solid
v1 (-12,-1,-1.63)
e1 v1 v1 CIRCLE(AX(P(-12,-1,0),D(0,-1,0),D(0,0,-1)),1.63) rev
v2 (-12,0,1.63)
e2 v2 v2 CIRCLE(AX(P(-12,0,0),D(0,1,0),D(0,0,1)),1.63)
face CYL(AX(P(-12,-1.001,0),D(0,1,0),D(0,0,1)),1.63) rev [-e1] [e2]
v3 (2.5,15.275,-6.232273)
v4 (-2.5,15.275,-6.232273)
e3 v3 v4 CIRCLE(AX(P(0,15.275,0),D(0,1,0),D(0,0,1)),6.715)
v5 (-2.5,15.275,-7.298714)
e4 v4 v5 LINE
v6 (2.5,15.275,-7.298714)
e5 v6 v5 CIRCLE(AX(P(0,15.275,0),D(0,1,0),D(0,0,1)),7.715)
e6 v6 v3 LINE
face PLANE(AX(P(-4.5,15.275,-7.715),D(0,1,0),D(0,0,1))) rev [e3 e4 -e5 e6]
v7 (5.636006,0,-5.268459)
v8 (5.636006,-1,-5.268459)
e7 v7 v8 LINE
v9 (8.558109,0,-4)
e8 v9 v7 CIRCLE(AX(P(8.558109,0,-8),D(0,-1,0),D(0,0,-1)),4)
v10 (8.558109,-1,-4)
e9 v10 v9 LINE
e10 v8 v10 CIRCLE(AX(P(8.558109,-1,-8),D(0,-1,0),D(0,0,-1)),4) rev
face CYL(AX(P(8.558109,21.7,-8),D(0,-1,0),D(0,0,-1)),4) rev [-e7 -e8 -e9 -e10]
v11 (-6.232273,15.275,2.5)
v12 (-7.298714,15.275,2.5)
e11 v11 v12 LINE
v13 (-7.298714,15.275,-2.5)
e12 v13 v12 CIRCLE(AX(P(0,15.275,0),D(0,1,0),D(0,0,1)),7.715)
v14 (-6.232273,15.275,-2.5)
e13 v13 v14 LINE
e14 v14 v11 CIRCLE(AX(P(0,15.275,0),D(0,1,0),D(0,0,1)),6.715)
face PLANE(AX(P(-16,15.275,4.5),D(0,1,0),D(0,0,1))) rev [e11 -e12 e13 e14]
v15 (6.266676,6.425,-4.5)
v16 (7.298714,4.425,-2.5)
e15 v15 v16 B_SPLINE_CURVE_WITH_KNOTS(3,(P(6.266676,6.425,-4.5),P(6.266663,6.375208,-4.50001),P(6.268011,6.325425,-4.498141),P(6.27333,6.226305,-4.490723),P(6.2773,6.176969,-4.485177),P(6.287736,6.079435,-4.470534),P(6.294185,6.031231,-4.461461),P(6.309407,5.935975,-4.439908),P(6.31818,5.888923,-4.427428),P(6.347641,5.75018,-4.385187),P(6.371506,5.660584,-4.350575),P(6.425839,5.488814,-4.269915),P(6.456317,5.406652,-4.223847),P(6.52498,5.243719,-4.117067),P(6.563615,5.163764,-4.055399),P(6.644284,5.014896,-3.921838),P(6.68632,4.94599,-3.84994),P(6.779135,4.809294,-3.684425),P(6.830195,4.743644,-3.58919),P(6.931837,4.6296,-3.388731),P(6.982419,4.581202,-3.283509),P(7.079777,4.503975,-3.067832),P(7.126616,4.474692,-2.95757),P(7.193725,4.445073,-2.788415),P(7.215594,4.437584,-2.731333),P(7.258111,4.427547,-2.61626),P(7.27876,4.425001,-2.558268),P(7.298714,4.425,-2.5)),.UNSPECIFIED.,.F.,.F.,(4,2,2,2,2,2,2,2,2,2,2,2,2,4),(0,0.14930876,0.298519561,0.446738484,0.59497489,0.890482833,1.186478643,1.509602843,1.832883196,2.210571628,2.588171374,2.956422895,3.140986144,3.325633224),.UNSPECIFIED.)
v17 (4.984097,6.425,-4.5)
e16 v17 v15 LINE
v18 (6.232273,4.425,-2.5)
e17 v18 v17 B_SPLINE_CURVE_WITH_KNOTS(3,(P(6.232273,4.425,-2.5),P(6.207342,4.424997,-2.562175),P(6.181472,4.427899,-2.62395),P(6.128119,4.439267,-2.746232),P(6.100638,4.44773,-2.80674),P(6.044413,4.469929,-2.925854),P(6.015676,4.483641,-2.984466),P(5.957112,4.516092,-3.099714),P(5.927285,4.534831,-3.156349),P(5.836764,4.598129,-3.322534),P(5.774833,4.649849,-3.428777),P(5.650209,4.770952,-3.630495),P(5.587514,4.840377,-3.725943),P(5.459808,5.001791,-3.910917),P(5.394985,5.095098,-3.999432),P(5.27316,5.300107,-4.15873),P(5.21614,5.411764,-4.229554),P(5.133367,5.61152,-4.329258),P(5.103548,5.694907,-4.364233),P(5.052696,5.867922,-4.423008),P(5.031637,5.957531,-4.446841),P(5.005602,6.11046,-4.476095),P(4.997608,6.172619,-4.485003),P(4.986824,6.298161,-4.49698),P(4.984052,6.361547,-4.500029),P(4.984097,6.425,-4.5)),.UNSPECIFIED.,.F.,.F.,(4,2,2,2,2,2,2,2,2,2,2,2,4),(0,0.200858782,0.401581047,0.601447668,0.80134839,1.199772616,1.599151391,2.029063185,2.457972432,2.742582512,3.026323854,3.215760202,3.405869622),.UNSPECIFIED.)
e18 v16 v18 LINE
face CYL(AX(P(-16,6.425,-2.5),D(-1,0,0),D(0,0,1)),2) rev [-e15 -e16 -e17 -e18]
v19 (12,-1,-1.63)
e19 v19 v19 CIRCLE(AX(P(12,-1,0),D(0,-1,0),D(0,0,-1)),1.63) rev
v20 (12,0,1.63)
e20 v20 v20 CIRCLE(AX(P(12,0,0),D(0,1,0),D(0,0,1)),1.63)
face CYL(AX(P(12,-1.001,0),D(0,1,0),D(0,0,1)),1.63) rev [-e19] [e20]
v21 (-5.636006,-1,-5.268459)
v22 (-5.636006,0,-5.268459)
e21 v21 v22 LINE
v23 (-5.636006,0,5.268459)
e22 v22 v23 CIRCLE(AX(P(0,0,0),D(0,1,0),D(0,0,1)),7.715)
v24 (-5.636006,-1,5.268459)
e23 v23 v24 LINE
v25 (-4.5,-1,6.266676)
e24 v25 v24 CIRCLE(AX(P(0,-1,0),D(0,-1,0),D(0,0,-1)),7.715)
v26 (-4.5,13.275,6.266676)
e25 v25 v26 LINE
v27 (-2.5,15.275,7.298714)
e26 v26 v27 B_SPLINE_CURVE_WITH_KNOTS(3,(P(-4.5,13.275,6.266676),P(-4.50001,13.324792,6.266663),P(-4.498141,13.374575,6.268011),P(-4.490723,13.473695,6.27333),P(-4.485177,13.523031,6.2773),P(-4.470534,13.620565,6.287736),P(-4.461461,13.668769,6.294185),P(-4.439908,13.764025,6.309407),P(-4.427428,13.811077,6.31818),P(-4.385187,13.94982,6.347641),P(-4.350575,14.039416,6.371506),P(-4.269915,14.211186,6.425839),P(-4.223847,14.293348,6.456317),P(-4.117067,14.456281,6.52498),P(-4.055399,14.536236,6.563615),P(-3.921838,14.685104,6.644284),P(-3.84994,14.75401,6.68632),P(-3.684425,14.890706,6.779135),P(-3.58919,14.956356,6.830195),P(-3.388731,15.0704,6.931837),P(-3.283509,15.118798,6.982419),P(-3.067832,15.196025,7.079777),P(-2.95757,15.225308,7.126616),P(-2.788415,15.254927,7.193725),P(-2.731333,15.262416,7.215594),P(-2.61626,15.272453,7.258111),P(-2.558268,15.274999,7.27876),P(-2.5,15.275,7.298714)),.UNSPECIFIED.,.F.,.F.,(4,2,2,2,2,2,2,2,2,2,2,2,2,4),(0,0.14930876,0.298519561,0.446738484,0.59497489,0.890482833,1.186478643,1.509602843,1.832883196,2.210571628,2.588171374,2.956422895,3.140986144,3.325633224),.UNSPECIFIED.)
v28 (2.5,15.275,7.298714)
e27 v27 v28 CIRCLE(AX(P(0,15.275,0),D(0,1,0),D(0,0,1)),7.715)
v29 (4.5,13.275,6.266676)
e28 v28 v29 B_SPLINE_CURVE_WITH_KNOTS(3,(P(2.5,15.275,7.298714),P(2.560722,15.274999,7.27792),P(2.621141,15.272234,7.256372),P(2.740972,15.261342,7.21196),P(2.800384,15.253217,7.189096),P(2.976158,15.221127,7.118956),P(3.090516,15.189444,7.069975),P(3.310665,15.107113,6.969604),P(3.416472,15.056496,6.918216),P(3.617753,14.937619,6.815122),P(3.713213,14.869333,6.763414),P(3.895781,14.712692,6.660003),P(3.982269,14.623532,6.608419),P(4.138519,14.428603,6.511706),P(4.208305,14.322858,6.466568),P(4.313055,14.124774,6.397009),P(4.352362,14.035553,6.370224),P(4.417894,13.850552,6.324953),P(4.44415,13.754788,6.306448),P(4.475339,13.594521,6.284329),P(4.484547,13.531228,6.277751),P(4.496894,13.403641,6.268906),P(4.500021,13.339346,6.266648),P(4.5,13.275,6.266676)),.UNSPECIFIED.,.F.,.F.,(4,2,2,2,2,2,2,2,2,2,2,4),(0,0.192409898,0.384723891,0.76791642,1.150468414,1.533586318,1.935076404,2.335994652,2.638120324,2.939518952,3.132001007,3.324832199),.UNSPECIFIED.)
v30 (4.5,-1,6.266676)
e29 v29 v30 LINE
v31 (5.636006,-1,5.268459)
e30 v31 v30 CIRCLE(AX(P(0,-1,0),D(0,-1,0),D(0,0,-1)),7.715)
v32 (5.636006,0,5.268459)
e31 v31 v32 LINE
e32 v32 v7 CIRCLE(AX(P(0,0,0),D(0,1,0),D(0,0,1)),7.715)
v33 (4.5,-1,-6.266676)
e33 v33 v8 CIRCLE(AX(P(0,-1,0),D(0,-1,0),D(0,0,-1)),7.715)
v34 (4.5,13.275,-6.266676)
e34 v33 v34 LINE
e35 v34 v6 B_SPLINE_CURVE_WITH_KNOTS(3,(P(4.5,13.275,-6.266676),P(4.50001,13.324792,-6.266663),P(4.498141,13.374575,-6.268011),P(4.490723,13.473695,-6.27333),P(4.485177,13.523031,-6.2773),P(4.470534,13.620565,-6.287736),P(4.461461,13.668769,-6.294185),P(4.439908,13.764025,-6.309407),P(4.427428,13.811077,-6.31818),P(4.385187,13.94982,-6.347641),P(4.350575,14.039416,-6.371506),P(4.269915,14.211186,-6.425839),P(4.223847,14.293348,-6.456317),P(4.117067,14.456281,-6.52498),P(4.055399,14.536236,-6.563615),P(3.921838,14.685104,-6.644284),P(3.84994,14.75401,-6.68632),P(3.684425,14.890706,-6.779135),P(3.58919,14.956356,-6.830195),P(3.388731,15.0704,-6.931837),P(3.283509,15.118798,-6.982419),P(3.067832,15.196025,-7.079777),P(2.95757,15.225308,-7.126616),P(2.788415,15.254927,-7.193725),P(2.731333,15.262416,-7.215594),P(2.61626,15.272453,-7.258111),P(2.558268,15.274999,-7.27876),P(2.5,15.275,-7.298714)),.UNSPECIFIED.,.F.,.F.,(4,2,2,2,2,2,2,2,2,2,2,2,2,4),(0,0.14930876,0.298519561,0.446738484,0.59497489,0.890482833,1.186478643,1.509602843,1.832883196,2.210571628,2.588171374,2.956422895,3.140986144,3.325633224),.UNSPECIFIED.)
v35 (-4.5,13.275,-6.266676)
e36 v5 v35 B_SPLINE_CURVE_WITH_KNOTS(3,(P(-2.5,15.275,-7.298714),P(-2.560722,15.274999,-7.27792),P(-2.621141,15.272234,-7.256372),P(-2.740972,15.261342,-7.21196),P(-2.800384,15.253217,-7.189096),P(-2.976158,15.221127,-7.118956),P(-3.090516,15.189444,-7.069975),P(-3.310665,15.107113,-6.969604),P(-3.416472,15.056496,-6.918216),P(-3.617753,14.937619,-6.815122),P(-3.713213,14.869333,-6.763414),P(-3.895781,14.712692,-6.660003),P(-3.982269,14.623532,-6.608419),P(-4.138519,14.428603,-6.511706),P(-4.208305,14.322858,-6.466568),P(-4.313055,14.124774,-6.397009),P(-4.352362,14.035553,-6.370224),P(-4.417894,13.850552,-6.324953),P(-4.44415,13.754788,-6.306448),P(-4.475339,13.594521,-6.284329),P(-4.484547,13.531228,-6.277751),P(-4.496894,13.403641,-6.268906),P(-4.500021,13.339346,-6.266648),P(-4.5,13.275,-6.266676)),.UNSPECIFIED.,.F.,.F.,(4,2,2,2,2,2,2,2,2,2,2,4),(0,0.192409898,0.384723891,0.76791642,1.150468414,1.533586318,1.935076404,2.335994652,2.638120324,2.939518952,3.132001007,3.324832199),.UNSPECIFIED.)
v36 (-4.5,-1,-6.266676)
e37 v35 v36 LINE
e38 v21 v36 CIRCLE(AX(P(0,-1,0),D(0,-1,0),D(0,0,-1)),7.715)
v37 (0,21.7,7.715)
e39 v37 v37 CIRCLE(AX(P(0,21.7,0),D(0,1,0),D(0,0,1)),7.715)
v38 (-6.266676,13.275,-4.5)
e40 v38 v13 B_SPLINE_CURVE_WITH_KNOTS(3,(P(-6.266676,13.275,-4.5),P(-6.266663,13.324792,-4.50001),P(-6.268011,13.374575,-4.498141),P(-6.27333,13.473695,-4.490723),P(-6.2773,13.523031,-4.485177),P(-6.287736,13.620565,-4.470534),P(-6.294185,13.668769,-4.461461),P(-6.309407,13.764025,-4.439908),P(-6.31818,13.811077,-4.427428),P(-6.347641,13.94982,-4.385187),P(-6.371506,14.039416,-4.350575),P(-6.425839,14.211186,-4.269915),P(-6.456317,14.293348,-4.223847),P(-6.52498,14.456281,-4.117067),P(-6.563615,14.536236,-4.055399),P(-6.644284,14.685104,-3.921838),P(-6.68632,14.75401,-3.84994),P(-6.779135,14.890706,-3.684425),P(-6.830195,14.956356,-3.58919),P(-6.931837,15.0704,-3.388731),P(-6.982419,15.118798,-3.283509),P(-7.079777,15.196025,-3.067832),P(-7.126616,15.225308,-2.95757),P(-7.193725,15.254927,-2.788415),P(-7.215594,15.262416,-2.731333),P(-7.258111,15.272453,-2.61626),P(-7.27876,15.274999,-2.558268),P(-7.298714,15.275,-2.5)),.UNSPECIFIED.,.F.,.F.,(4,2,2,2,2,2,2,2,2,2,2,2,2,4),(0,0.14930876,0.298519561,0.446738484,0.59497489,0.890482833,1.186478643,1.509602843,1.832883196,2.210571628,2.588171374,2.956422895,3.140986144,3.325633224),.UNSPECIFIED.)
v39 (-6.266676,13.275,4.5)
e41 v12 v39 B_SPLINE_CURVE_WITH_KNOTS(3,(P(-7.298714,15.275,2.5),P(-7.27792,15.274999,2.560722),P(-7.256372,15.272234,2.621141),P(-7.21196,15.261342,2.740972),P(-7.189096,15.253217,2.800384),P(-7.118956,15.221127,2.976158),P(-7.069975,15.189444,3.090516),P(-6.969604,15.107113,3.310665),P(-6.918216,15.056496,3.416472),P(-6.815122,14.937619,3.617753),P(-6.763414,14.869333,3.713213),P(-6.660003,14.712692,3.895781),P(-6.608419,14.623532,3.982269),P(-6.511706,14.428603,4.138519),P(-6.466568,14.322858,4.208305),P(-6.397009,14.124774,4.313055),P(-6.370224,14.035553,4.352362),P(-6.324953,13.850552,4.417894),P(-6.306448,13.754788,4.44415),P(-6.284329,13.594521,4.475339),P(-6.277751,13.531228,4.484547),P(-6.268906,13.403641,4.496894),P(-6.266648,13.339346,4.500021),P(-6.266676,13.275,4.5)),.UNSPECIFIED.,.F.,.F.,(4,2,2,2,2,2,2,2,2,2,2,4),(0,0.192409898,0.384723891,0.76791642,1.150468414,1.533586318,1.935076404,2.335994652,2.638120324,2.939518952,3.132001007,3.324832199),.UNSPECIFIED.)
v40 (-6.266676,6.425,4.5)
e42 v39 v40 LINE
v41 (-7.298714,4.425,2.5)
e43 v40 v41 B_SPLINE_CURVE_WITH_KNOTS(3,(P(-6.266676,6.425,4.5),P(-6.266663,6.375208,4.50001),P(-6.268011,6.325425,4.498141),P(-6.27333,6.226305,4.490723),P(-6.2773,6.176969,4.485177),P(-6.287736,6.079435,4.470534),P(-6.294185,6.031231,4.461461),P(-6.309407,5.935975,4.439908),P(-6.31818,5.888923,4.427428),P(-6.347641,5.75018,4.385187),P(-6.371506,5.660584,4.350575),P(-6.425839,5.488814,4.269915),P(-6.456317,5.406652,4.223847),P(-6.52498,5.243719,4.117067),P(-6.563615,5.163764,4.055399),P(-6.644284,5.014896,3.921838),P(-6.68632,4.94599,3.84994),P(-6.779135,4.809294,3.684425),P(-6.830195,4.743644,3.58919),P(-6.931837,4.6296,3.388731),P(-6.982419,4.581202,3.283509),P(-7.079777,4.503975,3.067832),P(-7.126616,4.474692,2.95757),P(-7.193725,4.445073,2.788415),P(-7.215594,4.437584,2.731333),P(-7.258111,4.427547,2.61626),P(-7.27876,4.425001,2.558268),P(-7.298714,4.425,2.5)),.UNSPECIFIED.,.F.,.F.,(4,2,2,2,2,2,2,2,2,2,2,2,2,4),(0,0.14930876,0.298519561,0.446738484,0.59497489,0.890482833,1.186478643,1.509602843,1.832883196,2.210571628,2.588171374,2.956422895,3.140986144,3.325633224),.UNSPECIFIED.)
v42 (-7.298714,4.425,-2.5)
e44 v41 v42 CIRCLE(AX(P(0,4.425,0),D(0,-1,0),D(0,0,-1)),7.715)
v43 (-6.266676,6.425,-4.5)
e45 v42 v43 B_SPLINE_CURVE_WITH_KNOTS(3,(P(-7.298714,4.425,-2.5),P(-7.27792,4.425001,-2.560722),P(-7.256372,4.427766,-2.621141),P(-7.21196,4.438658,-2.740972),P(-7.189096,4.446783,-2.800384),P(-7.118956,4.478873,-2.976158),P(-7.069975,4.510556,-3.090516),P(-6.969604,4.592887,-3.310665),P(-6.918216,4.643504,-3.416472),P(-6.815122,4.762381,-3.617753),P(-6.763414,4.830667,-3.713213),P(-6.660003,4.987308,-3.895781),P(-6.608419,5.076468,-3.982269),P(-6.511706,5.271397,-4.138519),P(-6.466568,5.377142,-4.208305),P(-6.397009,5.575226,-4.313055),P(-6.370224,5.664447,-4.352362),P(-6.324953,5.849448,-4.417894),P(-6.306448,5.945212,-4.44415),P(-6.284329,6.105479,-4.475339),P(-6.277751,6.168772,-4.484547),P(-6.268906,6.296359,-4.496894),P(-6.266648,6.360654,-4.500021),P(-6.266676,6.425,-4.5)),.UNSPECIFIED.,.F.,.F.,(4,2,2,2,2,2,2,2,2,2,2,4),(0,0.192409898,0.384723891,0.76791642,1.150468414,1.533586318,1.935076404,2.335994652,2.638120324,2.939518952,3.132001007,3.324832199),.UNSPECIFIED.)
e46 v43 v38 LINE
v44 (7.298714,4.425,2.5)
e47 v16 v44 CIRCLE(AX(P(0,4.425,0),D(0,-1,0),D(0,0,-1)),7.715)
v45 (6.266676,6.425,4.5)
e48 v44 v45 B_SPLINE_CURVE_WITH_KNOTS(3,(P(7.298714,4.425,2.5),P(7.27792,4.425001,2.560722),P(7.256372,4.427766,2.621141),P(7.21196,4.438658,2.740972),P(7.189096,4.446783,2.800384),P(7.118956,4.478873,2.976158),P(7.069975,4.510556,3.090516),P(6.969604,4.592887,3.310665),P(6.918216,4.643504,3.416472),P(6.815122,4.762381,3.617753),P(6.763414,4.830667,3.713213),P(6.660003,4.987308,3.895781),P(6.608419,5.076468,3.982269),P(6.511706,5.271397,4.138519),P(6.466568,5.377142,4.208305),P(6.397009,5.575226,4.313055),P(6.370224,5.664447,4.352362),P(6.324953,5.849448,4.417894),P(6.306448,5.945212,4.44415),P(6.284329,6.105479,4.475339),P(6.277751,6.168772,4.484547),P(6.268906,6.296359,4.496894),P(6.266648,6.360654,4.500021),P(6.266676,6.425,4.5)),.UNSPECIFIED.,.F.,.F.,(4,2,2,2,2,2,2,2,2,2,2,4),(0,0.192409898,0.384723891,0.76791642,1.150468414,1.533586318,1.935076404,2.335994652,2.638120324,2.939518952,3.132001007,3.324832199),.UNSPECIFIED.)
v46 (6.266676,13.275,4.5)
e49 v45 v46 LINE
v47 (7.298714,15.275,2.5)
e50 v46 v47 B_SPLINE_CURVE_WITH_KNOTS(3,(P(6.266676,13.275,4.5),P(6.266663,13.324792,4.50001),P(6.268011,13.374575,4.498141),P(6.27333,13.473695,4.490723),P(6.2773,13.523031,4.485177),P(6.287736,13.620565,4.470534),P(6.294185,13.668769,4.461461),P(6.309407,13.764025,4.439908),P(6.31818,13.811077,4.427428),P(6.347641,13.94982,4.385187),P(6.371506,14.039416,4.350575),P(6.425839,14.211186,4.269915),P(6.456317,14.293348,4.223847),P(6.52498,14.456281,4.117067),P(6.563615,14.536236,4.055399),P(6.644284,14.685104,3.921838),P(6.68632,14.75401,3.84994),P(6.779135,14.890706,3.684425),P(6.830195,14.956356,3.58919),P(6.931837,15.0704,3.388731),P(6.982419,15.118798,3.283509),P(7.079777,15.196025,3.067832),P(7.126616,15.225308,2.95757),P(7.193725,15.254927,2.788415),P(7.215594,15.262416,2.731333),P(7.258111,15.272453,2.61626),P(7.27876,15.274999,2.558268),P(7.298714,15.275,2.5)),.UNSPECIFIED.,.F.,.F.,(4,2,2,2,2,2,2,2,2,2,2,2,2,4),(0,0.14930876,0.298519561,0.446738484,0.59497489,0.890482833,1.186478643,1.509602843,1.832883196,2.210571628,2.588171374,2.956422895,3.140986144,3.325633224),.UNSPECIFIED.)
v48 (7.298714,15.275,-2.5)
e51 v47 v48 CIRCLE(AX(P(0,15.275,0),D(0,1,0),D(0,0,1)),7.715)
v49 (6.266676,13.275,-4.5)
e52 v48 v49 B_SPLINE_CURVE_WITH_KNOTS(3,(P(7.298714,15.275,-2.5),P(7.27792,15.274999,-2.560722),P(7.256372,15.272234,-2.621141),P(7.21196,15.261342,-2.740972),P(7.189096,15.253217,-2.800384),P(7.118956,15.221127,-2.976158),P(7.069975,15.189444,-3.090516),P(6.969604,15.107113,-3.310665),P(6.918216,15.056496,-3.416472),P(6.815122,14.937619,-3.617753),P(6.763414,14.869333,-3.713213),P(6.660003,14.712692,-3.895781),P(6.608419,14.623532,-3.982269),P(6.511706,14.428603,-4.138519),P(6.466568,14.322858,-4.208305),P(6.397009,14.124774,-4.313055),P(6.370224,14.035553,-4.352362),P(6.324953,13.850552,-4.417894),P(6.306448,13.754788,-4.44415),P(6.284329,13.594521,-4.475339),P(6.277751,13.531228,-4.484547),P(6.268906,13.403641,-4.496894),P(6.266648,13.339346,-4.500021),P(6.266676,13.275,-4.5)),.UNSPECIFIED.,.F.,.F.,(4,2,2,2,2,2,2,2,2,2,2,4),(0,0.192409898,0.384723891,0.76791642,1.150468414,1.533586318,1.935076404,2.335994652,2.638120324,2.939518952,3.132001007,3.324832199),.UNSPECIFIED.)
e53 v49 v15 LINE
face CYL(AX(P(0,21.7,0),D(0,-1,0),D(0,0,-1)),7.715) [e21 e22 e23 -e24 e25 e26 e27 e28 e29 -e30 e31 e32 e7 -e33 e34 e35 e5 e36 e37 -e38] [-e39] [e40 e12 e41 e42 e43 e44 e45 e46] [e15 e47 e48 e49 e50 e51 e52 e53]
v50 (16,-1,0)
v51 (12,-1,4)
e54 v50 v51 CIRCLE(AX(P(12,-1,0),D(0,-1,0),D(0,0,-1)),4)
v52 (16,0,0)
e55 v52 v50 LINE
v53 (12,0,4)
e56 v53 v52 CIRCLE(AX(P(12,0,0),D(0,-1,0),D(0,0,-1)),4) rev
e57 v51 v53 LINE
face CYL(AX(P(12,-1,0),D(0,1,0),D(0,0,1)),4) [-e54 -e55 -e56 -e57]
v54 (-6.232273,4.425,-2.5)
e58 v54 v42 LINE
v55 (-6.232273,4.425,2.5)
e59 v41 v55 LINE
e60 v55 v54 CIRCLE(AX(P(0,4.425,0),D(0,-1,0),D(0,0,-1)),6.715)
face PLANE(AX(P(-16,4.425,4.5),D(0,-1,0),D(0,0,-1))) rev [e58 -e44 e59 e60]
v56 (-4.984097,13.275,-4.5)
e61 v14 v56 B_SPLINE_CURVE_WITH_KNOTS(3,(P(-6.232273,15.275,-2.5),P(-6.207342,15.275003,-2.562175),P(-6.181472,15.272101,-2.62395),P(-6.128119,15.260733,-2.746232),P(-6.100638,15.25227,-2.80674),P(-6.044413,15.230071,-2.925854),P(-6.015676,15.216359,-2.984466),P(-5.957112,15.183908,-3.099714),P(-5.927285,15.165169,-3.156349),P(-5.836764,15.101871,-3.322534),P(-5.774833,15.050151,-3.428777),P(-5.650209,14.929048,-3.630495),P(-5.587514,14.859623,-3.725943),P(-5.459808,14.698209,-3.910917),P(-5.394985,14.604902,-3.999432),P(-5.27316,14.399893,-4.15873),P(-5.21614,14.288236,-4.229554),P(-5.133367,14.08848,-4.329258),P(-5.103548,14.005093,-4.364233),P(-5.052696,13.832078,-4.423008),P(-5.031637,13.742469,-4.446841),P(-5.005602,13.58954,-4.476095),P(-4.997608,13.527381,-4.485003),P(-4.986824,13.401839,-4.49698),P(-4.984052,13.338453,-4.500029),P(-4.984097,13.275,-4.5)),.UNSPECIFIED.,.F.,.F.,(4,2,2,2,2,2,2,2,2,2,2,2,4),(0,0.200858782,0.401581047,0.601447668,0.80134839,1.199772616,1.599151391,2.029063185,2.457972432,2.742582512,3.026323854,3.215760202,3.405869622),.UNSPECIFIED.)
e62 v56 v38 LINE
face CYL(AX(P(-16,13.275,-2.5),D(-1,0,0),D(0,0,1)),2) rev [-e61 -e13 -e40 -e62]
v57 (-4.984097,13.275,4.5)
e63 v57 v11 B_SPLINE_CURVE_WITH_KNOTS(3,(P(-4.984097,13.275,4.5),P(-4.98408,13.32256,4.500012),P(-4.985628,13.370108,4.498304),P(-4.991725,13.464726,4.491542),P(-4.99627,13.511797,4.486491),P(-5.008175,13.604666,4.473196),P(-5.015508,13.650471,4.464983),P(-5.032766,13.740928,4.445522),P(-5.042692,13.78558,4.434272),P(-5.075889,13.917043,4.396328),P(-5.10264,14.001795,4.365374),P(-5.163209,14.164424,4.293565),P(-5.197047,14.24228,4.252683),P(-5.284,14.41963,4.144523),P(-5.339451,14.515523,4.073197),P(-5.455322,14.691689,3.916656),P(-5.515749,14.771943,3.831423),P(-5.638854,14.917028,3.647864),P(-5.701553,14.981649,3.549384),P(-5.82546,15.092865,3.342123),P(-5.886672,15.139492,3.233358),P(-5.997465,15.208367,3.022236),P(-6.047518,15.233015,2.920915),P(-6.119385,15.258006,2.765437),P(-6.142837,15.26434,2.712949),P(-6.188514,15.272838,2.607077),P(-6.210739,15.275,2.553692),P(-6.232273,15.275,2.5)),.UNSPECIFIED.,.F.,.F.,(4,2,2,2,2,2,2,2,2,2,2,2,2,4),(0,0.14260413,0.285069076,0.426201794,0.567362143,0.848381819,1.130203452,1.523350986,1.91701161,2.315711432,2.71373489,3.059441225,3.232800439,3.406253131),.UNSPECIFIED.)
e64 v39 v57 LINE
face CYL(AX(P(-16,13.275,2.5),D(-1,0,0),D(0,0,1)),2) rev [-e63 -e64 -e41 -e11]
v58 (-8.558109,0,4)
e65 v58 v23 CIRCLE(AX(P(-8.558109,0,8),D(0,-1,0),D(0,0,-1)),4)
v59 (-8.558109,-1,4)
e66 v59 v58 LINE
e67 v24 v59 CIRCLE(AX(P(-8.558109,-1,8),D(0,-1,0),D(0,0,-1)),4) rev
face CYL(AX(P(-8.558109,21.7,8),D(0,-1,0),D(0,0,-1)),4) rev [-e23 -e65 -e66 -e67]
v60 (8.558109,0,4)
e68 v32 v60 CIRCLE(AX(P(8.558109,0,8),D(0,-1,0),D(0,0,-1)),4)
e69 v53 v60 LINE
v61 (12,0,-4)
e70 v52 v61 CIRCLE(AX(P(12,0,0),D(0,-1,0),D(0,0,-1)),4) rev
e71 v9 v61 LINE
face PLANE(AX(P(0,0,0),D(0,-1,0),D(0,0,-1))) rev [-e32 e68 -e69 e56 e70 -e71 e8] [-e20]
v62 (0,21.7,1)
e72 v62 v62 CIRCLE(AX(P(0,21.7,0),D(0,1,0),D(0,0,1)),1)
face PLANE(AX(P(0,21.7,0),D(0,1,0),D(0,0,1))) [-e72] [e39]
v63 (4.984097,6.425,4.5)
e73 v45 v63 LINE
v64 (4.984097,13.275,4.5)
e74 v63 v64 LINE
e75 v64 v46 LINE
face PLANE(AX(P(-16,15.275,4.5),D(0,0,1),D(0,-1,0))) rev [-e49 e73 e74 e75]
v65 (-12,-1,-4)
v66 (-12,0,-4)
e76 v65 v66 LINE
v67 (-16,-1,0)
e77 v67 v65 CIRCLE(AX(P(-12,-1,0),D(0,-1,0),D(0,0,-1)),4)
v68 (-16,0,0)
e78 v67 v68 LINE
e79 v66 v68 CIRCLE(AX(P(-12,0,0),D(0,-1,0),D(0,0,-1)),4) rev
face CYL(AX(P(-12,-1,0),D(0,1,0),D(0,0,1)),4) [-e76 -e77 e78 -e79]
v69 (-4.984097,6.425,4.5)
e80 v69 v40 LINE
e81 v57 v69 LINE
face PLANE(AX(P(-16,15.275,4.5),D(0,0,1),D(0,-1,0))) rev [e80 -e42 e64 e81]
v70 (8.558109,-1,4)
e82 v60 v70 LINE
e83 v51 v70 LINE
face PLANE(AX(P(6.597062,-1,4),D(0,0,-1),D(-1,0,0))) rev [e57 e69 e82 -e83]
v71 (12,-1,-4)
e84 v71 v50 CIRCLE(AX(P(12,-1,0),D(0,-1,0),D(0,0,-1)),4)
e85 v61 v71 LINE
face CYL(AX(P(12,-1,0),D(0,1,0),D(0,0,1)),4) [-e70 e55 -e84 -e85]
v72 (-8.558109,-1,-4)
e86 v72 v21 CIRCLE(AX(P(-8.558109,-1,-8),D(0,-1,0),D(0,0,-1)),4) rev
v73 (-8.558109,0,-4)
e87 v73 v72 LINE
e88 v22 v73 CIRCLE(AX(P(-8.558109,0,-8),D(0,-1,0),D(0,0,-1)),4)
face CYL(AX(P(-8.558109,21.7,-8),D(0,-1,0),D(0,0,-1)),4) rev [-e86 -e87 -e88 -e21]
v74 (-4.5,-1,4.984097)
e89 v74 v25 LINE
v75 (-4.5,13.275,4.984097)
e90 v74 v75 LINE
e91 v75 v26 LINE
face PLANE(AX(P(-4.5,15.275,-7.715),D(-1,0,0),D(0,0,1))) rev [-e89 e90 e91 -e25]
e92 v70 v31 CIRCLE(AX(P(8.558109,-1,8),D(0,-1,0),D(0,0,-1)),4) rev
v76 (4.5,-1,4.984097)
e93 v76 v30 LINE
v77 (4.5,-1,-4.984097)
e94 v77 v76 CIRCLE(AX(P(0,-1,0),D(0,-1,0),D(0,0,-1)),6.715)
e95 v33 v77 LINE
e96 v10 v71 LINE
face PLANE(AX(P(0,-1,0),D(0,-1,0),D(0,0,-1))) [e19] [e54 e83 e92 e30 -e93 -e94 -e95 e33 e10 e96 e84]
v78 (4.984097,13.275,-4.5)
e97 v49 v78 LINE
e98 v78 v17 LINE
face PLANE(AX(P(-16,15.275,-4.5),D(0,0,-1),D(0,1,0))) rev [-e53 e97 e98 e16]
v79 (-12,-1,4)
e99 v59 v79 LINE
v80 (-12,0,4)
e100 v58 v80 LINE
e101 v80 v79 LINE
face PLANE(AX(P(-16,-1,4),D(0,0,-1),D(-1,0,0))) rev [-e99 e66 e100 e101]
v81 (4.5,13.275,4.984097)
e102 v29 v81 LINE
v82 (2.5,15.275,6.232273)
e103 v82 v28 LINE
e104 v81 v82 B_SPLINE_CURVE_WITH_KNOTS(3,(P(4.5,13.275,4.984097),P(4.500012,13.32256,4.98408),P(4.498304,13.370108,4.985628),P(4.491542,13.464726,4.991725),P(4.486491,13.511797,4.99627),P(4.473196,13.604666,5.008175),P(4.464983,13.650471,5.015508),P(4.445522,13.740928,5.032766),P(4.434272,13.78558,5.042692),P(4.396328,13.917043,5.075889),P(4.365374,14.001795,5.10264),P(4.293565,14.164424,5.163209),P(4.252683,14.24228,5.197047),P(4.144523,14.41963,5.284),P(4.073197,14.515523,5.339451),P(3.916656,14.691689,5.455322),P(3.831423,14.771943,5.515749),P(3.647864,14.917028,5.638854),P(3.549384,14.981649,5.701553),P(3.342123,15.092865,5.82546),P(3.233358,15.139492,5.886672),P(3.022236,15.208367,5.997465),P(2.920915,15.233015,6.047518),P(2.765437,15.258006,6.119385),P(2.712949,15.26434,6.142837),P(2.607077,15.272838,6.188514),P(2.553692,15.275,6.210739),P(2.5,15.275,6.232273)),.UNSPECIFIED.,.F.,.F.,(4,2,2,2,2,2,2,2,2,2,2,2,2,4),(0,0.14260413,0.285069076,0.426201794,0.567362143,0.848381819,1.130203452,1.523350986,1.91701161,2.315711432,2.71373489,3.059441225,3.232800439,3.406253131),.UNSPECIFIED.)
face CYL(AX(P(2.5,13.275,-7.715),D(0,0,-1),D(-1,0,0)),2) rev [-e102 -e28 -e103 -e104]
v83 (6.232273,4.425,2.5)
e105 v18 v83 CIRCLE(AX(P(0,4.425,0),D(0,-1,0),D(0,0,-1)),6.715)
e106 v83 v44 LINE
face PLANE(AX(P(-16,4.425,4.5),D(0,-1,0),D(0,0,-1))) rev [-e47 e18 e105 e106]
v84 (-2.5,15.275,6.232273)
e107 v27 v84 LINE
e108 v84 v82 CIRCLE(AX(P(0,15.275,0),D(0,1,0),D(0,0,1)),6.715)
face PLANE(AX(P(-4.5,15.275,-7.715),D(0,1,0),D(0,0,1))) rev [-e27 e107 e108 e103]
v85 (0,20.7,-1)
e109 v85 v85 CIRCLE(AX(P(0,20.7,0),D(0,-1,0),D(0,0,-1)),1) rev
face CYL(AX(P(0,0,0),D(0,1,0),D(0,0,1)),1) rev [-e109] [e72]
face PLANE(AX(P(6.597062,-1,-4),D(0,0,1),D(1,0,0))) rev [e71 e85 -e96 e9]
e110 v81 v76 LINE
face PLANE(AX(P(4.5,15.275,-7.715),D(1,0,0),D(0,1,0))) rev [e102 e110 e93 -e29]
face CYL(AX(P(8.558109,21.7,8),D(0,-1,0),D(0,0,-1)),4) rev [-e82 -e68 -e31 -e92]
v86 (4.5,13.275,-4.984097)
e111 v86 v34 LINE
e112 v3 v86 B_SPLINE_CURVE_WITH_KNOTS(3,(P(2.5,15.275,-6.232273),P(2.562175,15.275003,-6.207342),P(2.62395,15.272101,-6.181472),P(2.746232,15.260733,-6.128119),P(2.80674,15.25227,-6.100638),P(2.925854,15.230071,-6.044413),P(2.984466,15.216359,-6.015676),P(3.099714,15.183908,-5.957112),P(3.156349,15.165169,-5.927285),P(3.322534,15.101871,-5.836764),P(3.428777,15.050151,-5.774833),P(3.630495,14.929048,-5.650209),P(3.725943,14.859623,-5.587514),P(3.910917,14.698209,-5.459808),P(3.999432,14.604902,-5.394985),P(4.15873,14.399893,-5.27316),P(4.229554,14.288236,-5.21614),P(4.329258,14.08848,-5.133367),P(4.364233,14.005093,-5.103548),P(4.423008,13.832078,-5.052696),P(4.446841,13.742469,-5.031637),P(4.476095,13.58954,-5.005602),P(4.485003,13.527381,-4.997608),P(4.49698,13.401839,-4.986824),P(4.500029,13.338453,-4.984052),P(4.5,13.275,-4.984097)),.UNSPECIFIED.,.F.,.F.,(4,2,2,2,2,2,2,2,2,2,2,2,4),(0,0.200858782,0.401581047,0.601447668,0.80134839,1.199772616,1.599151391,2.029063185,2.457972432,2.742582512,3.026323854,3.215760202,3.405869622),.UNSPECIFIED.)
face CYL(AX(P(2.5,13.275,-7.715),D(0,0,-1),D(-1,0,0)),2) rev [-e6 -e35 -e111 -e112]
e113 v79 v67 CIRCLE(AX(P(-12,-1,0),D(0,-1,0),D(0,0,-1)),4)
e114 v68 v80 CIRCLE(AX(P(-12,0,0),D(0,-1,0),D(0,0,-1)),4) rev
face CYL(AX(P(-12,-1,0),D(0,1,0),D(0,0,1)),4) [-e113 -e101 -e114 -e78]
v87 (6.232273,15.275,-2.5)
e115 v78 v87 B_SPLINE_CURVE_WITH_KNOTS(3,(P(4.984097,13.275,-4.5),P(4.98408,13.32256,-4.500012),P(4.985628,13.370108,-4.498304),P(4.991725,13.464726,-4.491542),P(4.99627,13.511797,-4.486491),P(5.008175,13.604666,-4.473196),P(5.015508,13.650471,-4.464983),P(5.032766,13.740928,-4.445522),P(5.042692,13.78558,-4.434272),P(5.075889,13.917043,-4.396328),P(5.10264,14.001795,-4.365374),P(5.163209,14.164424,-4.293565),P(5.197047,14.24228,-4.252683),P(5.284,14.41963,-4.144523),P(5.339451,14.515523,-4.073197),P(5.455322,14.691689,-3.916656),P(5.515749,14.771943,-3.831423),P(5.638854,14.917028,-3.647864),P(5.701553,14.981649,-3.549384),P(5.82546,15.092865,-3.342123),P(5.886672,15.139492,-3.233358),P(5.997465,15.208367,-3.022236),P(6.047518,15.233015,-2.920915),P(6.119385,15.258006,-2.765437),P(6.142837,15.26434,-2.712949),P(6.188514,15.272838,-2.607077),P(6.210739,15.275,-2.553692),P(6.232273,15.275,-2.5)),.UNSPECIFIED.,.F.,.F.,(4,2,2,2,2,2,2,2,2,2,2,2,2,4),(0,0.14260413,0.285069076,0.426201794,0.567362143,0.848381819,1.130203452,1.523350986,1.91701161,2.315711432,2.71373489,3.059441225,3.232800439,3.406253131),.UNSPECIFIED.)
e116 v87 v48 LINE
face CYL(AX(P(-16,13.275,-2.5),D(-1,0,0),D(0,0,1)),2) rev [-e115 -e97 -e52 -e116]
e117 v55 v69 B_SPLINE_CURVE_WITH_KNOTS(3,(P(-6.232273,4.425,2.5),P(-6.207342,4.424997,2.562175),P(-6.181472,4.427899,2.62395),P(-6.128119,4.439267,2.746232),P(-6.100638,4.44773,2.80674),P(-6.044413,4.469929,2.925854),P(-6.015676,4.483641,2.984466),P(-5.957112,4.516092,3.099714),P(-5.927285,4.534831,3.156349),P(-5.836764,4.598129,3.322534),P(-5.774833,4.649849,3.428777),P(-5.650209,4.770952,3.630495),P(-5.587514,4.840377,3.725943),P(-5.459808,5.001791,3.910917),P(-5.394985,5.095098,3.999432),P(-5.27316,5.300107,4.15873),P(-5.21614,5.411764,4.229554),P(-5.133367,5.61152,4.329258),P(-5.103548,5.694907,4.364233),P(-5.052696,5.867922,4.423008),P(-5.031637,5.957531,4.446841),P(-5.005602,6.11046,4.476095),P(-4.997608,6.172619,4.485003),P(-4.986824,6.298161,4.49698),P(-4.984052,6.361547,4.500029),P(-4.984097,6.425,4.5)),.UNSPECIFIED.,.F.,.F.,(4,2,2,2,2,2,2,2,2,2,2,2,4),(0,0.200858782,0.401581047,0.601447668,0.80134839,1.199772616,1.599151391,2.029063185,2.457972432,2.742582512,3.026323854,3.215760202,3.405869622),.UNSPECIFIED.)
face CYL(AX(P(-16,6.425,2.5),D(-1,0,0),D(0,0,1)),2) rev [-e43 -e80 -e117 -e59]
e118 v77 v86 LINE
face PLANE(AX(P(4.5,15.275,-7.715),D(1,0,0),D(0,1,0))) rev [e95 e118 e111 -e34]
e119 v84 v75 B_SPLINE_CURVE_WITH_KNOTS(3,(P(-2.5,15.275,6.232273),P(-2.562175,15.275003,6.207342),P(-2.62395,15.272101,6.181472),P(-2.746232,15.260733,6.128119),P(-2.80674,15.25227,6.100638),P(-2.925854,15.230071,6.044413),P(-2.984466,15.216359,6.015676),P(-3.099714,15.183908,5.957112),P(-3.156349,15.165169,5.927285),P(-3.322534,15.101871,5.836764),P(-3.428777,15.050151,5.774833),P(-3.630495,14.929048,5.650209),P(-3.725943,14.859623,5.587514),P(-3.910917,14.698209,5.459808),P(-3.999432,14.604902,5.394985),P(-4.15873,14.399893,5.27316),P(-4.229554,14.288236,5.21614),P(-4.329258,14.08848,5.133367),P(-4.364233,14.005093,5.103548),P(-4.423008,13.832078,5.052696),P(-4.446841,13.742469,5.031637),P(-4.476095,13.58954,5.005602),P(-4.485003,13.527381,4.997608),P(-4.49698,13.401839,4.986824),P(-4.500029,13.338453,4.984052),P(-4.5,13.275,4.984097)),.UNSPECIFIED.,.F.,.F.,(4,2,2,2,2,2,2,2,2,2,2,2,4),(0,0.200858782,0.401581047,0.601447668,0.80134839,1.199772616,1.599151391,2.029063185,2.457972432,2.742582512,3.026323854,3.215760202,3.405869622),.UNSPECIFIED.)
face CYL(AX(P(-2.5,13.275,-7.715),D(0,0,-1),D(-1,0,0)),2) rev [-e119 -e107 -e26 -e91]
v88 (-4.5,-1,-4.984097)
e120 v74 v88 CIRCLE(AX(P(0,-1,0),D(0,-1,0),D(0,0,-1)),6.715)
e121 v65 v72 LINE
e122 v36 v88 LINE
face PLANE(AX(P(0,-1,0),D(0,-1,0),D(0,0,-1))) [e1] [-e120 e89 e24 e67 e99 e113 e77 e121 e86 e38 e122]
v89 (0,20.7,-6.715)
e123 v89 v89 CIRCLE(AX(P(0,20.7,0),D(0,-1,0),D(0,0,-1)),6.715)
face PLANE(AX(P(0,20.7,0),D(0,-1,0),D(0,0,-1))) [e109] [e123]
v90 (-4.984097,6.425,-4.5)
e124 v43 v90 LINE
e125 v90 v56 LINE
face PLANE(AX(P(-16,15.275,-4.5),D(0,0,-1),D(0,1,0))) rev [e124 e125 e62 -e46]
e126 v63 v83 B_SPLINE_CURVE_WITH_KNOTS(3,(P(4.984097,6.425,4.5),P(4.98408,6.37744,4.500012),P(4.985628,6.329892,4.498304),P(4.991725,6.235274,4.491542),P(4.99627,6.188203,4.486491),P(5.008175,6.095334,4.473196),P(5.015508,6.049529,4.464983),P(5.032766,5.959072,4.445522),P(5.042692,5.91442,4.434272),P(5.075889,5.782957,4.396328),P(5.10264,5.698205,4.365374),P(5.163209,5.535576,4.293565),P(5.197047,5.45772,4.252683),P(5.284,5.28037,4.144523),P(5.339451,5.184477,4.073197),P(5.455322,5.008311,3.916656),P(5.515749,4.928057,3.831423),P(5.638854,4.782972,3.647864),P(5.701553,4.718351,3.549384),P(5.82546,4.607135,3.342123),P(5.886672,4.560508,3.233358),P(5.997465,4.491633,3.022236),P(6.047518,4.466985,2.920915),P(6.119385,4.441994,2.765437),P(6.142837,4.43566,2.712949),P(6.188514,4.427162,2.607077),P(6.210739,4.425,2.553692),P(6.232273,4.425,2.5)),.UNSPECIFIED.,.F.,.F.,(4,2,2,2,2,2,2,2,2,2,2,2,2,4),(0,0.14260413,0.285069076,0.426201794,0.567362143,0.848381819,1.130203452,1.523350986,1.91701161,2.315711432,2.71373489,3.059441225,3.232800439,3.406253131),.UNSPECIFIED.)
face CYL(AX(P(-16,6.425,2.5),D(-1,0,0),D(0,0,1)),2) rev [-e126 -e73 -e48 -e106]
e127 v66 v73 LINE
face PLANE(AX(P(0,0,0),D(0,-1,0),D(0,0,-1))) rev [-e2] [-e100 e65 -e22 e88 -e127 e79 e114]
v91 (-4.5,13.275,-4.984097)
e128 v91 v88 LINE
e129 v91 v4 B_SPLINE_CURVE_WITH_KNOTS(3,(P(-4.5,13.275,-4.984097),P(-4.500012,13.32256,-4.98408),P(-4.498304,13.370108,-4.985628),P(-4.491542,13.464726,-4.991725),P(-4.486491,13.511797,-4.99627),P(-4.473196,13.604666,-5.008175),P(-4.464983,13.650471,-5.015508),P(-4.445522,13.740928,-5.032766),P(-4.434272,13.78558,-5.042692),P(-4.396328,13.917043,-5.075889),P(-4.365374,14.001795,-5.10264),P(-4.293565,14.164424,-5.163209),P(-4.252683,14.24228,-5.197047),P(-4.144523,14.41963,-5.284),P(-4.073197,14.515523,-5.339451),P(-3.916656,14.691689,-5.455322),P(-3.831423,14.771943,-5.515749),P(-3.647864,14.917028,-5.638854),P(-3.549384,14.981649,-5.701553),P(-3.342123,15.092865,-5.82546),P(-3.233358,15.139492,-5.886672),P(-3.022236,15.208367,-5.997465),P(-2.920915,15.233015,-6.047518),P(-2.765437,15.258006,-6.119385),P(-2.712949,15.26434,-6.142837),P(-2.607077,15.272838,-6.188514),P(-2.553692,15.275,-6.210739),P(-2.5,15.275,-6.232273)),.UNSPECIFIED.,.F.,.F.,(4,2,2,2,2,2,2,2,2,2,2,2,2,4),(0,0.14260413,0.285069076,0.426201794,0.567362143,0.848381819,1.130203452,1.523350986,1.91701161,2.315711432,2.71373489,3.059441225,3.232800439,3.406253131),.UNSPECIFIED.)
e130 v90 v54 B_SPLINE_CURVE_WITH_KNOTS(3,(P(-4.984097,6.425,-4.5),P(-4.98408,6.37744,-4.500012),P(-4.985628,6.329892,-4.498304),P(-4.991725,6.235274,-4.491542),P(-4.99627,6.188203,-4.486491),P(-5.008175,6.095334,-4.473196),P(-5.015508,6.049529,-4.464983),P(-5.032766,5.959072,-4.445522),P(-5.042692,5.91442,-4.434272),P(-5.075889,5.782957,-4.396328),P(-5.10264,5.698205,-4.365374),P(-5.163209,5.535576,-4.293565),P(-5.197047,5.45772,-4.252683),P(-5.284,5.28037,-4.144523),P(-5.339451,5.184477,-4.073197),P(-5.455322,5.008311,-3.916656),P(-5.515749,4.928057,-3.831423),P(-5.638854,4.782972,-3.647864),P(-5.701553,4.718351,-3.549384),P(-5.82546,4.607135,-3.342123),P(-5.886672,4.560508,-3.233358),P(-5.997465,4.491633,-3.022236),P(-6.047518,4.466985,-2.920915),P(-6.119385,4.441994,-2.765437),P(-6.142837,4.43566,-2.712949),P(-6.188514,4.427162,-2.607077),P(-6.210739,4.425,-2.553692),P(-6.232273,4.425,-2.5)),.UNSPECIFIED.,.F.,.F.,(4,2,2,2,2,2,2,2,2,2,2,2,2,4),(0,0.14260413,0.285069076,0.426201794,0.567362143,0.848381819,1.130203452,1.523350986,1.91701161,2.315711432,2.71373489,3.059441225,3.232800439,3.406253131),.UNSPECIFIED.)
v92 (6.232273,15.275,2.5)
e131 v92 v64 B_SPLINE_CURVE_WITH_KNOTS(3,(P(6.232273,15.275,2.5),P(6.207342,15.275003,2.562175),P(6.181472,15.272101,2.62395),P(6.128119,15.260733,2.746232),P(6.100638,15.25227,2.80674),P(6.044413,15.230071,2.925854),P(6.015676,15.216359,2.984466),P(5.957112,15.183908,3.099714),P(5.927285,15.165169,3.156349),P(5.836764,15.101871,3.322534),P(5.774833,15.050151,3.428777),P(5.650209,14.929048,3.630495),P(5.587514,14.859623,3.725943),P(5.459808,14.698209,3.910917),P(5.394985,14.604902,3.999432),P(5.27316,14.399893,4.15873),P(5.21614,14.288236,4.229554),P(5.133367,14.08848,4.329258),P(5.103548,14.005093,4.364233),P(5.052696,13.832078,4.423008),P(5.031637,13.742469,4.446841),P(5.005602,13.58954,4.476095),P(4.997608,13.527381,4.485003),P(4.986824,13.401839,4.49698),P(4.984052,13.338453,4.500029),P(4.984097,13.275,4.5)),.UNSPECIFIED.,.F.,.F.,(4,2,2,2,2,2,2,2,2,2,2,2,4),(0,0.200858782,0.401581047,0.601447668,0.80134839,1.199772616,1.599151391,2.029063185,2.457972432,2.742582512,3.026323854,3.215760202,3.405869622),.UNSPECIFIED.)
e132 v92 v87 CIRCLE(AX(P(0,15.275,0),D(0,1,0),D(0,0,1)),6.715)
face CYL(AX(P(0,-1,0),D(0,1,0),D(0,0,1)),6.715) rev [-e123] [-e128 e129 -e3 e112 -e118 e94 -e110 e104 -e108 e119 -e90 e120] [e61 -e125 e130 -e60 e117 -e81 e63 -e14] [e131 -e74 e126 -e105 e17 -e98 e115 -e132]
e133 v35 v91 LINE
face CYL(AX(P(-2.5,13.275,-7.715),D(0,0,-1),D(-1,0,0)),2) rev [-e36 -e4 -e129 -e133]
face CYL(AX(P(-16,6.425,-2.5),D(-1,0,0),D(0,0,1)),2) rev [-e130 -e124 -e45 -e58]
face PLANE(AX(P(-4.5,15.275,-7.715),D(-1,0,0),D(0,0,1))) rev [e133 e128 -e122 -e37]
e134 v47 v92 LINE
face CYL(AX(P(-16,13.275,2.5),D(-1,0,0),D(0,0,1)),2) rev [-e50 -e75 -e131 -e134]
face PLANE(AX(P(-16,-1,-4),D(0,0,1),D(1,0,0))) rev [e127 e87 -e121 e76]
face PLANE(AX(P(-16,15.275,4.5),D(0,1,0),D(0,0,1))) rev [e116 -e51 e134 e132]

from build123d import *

# Parameters (mm, degrees)
SKETCH2_R           = 7.715
BOSS_EXTRUDE1_DEPTH = 21.7
SKETCH4_R           = 1
CUT_EXTRUDE2_DEPTH  = 25.288525068
BOSS_EXTRUDE2_START = 1
SKETCH11_R          = 6.715
BOSS_EXTRUDE2_DEPTH = 1
SKETCH12_R          = 6.715
CUT_EXTRUDE7_DEPTH  = 20.7
CUT_EXTRUDE8_START  = -1
CUT_EXTRUDE8_DEPTH  = 16.275
SKETCH14_W          = 9
SKETCH14_H          = 10.85
CUT_EXTRUDE9_DEPTH  = 52.443281631
FILLET3_R           = 2
FILLET4_R           = 4
CUT_EXTRUDE10_REACH = 30.043
SKETCH15_R          = 1.63


# Read off the part's stored shape, not the designer's step: Cut-Extrude8
with BuildPart() as part:
    # Sketch2 → Boss-Extrude1 (new body)
    with BuildSketch(Plane(origin=(0, 0, 0), x_dir=(1, 0, 0), z_dir=(0, 1, 0))):
        with Locations(Location((0, 0, 0), (0, 0, 270))):
            Circle(SKETCH2_R)
    extrude(amount=BOSS_EXTRUDE1_DEPTH)

    # Sketch4 → Cut-Extrude2 (cut, through all)
    with BuildSketch(Plane(origin=(0, 21.7, 0), x_dir=(1, 0, 0), z_dir=(0, 1, 0))):
        with Locations(Location((0, 0, 0), (0, 0, 270))):
            Circle(SKETCH4_R)
    extrude(amount=-CUT_EXTRUDE2_DEPTH, mode=Mode.SUBTRACT)

    # Sketch11 → Boss-Extrude2 (add)
    with BuildSketch(Plane.XZ.offset(BOSS_EXTRUDE2_START)):
        with BuildLine():
            Line((6.597061846, 4), (16, 4))
            Line((16, 4), (16, -4))
            Line((16, -4), (6.597061846, -4))
            ThreePointArc((6.597061846, -4), (0, -7.715), (-6.597061846, -4))
            Line((-6.597061846, -4), (-16, -4))
            Line((-16, -4), (-16, 4))
            Line((-16, 4), (-6.597061846, 4))
            ThreePointArc((-6.597061846, 4), (0, 7.715), (6.597061846, 4))
        make_face()
        with Locations(Location((0, 0, 0), (0, 0, 270))):
            Circle(SKETCH11_R, mode=Mode.SUBTRACT)
    extrude(amount=-BOSS_EXTRUDE2_DEPTH)

    # Sketch12 → Cut-Extrude7 (cut)
    with BuildSketch(Plane.XZ):
        with Locations(Location((0, 0, 0), (0, 0, 270))):
            Circle(SKETCH12_R)
    extrude(amount=-CUT_EXTRUDE7_DEPTH, mode=Mode.SUBTRACT)

    # Cut-Extrude8 outline → Cut-Extrude8 (cut)
    with BuildSketch(Plane(origin=(0, 0, 0), x_dir=(1, 0, 0), z_dir=(0, 1, 0)).offset(CUT_EXTRUDE8_START)):
        with BuildLine():
            ThreePointArc((4.5, -4.98409721), (0, -6.715), (-4.5, -4.98409721))
            Line((-4.5, -4.98409721), (-4.5, -6.266675754))
            ThreePointArc((-4.5, -6.266675754), (0, -7.715), (4.5, -6.266675754))
            Line((4.5, -6.266675754), (4.5, -4.98409721))
        make_face()
        with BuildLine():
            Line((-4.5, 6.266675754), (-4.5, 4.98409721))
            ThreePointArc((-4.5, 4.98409721), (0, 6.715), (4.5, 4.98409721))
            Line((4.5, 4.98409721), (4.5, 6.266675754))
            ThreePointArc((4.5, 6.266675754), (0, 7.715), (-4.5, 6.266675754))
        make_face()
    extrude(amount=CUT_EXTRUDE8_DEPTH, mode=Mode.SUBTRACT)

    # Sketch14 → Cut-Extrude9 (cut, through all)
    with BuildSketch(Plane(origin=(30, 0, 0), x_dir=(0, 0, -1), z_dir=(1, 0, 0))):
        with Locations((0, 9.85)):
            Rectangle(SKETCH14_W, SKETCH14_H)
    extrude(amount=-CUT_EXTRUDE9_DEPTH, mode=Mode.SUBTRACT)

    # Fillet3
    fillet3_edges = [part.edges().sort_by_distance(p)[0] for p in [
        (4.5, 15.275, 5.625386482),
        (4.5, 15.275, -5.625386482),
        (-4.5, 15.275, -5.625386482),
        (-4.5, 15.275, 5.625386482),
        (5.625386482, 15.275, -4.5),
        (-5.625386482, 15.275, -4.5),
        (5.625386482, 4.425, -4.5),
        (-5.625386482, 4.425, -4.5),
        (-5.625386482, 4.425, 4.5),
        (5.625386482, 4.425, 4.5),
        (5.625386482, 15.275, 4.5),
        (-5.625386482, 15.275, 4.5),
    ]]
    fillet(fillet3_edges, radius=FILLET3_R)

    # Fillet4
    # the kernel refuses this fillet: 4 mm, written as the material it adds along each edge
    with BuildSketch(Plane(origin=(6.597061846, -1, -4), x_dir=(-0.6038984095873641, 0, -0.797061296825942), z_dir=(0, 1, 0)), Plane(origin=(-6.597061846, -1, 4), x_dir=(0.6038984095873637, 0, 0.7970612968259423), z_dir=(0, 1, 0))) as fillet4_piece_1:
        with BuildLine():
            CenterArc((2.003972094, -3.978668209), FILLET4_R, 95.919901586, 46.930484551)
            Line((-1.184273093, -1.563074571), (0, 0))
            ThreePointArc((0, 0), (0.795709969, -0.041143691), (1.591419939, 0))
        make_face()
    extrude(amount=1)
    with BuildSketch(Plane(origin=(6.597061846, -1, 4), x_dir=(-0.6038984095873636, 0, 0.7970612968259423), z_dir=(0, 1, 0)), Plane(origin=(-6.597061846, -1, -4), x_dir=(0.6038984095873643, 0, -0.7970612968259416), z_dir=(0, 1, 0))) as fillet4_piece_2:
        with BuildLine():
            CenterArc((2.003972094, 3.978668209), FILLET4_R, 217.149613863, 46.930484551)
            Line((-1.184273093, 1.563074571), (0, 0))
            ThreePointArc((0, 0), (0.795709969, 0.041143691), (1.591419939, 0))
        make_face()
    extrude(amount=1)
    # the kernel refuses this fillet: 4 mm, written as the material it takes off along each edge
    with BuildSketch(Plane(origin=(16, -11, -4), x_dir=(0, 0, 1), z_dir=(0, 1, 0)), Plane(origin=(16, -11, 4), x_dir=(-1, 0, 0), z_dir=(0, 1, 0))) as fillet4_2_piece_1:
        with BuildLine():
            CenterArc((FILLET4_R, -FILLET4_R), FILLET4_R, 90, 90)
            Line((0, -FILLET4_R), (0, 0))
            Line((0, 0), (FILLET4_R, 0))
        make_face()
    extrude(amount=21, mode=Mode.SUBTRACT)
    with BuildSketch(Plane(origin=(-16, -11, -4), x_dir=(0, 0, 1), z_dir=(0, 1, 0)), Plane(origin=(-16, -11, 4), x_dir=(1, 0, 0), z_dir=(0, 1, 0))) as fillet4_2_piece_2:
        with BuildLine():
            CenterArc((FILLET4_R, FILLET4_R), FILLET4_R, 180, 90)
            Line((0, FILLET4_R), (0, 0))
            Line((0, 0), (FILLET4_R, 0))
        make_face()
    extrude(amount=21, mode=Mode.SUBTRACT)

    # Sketch15 → Cut-Extrude10 (cut, up to next)
    with BuildSketch(Plane(origin=(0, 0, 0), x_dir=(1, 0, 0), z_dir=(0, 1, 0)), mode=Mode.PRIVATE) as cut_extrude10_sk1:
        with Locations(Location((-12, 0, 0), (0, 0, 270))):
            Circle(SKETCH15_R)
    cut_extrude10_tool1 = extrude(cut_extrude10_sk1.sketch, amount=-CUT_EXTRUDE10_REACH, mode=Mode.PRIVATE) & part.part
    # Sketch15 → Cut-Extrude10 (cut, up to next)
    with BuildSketch(Plane(origin=(0, 0, 0), x_dir=(1, 0, 0), z_dir=(0, 1, 0)), mode=Mode.PRIVATE) as cut_extrude10_sk2:
        with Locations(Location((12, 0, 0), (0, 0, 270))):
            Circle(SKETCH15_R)
    cut_extrude10_tool2 = extrude(cut_extrude10_sk2.sketch, amount=-CUT_EXTRUDE10_REACH, mode=Mode.PRIVATE) & part.part
    add(cut_extrude10_tool1.solids().sort_by_distance((-12, 0, 0))[0], mode=Mode.SUBTRACT)
    add(cut_extrude10_tool2.solids().sort_by_distance((12, 0, 0))[0], mode=Mode.SUBTRACT)


solid = part.part
